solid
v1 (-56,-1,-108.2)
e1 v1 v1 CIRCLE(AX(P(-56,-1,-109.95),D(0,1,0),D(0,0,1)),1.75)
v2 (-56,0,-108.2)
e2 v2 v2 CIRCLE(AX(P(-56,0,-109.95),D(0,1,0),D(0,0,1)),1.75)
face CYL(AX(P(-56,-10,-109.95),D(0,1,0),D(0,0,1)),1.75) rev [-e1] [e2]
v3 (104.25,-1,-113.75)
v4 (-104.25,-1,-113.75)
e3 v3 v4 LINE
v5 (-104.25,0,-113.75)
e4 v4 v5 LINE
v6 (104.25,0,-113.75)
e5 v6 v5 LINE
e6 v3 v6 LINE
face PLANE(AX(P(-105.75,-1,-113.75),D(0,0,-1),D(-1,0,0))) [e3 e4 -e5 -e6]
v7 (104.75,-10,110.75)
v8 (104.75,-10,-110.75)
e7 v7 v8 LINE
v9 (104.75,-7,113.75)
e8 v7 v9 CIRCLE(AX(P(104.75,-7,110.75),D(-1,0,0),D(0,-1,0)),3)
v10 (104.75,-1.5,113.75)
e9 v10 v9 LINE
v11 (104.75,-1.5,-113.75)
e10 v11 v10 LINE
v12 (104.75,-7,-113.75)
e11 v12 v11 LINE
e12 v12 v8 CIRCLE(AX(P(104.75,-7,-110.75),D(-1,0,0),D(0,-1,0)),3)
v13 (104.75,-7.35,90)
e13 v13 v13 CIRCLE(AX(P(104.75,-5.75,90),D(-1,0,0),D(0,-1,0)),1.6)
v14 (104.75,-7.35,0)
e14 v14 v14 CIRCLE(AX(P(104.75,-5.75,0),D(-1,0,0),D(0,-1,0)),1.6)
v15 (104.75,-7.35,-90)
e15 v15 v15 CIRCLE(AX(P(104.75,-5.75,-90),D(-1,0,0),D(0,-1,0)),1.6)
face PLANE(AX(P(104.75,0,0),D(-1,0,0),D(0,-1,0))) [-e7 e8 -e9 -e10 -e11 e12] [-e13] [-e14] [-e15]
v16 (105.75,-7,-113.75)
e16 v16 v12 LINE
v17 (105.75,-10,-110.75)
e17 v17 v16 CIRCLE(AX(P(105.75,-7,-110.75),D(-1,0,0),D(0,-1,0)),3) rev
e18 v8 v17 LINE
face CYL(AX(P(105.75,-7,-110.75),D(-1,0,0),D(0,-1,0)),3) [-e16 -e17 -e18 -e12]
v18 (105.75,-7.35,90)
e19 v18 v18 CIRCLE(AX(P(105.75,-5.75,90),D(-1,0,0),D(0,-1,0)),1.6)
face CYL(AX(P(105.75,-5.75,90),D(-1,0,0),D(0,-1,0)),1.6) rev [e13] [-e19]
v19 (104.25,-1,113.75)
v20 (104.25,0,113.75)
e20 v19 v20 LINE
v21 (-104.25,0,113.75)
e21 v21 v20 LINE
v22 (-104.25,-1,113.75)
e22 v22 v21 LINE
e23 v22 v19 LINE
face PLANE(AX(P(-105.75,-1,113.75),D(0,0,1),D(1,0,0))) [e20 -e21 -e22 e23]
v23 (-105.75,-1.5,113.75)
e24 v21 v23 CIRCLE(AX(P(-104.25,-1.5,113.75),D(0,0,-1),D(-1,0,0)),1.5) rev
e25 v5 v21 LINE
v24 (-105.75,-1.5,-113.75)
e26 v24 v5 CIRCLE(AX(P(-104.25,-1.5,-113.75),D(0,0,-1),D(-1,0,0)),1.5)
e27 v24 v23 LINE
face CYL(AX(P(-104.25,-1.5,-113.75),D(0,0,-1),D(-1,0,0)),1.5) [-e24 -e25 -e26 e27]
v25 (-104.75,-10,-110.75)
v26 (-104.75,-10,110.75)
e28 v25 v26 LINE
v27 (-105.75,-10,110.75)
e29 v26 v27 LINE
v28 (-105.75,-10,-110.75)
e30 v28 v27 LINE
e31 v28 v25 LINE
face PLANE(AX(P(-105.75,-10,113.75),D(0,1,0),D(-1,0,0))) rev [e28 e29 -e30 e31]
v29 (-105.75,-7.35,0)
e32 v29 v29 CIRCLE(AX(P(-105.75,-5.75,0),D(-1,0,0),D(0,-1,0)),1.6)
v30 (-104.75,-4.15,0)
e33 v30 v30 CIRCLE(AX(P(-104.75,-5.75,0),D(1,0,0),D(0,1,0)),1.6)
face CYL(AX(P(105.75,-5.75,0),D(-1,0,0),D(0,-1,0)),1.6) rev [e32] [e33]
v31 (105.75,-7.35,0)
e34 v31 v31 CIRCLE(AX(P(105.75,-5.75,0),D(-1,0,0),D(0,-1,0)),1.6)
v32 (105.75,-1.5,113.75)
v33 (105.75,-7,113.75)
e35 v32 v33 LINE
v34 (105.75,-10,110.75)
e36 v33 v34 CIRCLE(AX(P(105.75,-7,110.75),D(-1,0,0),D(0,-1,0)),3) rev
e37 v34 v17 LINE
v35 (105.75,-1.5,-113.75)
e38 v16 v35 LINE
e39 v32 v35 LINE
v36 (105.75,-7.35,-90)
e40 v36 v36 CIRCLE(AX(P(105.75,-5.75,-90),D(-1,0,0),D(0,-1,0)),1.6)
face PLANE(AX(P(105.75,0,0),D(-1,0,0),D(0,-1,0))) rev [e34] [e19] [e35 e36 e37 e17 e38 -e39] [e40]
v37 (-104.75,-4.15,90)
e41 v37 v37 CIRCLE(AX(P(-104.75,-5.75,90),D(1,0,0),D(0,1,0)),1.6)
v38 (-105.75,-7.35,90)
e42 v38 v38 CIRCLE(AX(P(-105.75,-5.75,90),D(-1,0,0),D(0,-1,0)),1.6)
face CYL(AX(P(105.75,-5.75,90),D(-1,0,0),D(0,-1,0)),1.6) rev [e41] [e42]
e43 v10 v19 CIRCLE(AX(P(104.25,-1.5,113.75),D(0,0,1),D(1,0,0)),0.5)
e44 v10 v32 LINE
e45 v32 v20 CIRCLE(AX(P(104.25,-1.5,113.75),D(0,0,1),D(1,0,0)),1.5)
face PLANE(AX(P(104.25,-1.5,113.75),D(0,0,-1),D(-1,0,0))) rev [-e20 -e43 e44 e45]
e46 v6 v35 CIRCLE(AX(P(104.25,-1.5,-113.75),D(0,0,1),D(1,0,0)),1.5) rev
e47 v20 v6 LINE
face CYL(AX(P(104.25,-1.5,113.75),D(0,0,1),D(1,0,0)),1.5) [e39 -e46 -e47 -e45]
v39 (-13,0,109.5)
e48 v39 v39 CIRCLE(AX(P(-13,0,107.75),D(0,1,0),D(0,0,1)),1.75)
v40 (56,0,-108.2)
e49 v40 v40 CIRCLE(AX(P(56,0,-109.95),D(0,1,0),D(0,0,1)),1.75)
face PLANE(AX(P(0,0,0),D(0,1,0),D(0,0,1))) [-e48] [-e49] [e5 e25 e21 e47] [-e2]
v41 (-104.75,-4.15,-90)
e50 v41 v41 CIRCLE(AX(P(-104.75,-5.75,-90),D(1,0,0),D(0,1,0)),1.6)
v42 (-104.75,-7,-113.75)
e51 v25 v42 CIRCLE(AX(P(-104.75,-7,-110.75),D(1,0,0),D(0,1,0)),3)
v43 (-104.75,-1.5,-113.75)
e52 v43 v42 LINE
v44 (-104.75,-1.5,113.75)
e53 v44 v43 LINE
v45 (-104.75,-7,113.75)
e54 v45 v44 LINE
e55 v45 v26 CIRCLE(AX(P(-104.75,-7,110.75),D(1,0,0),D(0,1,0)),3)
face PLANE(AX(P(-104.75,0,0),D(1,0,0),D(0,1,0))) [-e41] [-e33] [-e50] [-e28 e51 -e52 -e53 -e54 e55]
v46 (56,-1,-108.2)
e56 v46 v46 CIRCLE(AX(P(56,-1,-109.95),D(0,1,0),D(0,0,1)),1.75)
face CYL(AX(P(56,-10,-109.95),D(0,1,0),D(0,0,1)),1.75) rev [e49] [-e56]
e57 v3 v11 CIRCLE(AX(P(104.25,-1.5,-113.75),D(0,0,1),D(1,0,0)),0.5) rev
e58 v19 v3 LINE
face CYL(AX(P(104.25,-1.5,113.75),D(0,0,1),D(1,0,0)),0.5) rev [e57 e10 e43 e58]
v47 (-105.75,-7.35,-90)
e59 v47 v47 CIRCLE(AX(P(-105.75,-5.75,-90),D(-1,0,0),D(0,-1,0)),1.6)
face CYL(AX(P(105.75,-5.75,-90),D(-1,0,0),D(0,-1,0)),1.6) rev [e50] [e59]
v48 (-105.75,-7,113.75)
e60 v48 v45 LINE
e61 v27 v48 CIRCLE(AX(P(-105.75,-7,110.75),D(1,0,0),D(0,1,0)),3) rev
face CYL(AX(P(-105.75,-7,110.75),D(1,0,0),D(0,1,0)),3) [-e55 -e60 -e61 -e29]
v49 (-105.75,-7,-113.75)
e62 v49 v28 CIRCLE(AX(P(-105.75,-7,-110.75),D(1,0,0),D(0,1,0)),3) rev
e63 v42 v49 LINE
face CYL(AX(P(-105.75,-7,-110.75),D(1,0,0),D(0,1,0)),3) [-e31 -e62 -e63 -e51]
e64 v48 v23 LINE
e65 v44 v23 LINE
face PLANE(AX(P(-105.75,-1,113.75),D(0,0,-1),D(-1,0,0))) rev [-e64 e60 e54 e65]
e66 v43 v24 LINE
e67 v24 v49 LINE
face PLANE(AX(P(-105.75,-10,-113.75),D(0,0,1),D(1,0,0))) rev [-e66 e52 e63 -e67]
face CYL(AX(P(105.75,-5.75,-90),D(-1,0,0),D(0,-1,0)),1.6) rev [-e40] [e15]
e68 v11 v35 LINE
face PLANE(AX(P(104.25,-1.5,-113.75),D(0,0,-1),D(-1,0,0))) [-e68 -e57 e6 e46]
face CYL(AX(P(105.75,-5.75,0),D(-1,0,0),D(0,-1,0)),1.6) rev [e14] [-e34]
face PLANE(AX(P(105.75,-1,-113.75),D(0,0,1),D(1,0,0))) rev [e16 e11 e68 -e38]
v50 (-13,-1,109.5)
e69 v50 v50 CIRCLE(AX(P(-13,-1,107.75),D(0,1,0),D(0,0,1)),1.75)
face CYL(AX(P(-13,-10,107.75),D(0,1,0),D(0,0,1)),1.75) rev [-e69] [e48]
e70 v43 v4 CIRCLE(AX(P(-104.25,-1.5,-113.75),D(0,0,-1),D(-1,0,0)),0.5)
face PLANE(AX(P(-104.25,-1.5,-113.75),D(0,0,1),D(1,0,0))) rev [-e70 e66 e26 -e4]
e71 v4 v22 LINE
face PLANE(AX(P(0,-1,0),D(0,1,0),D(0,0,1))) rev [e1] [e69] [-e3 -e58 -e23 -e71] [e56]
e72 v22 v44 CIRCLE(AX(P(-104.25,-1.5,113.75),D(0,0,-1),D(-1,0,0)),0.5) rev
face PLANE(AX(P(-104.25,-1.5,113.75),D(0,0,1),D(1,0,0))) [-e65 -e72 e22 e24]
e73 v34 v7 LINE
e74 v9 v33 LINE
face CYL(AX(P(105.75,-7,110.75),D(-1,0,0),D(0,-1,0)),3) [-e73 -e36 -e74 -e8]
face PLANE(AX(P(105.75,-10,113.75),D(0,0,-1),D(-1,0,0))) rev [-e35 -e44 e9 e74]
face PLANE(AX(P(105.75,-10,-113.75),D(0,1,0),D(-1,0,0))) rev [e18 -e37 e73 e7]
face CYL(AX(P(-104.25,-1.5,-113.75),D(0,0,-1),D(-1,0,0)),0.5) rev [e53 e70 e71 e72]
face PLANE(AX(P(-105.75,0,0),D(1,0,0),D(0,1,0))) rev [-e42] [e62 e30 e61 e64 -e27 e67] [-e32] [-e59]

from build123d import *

# Parameters (mm, degrees)
SKETCH1_W                    = 211.5
SKETCH1_H                    = 227.5
BASE_FLANGE1_DEPTH           = 1
EDGE_FLANGE1_STRIP_W         = 5
EDGE_FLANGE1_STRIP_H         = 1
EDGE_FLANGE1_STRIP_CUT_DEPTH = 227.5
EDGE_FLANGE1_DEPTH           = 227.5
EDGE_FLANGE2_STRIP_W         = 5
EDGE_FLANGE2_STRIP_H         = 1
EDGE_FLANGE2_STRIP_CUT_DEPTH = 227.5
EDGE_FLANGE2_DEPTH           = 227.5
SKETCH13_R                   = 1.6
CUT_EXTRUDE1_DEPTH           = 241.356636064
FILLET1_R                    = 3
SKETCH14_R                   = 1.75
CUT_EXTRUDE2_DEPTH           = 156.634588058
SKETCH15_R                   = 1.75
CUT_EXTRUDE3_DEPTH           = 156.634588058


# Sheet-metal steps are written as plain solids
with BuildPart() as part:
    # Sketch1 → Base-Flange1 (new body)
    with BuildSketch(Plane(origin=(0, 0, 0), x_dir=(1, 0, 0), z_dir=(0, 1, 0))):
        Rectangle(SKETCH1_W, SKETCH1_H)
    extrude(amount=-BASE_FLANGE1_DEPTH)

    # Edge-Flange1 strip (across the edge) → Edge-Flange1 strip cut (cut)
    with BuildSketch(Plane(origin=(105.75, -1, -113.75), x_dir=(-1, 0, 0), z_dir=(0, 0, 1))):
        with Locations((-1, -0.5)):
            Rectangle(EDGE_FLANGE1_STRIP_W, EDGE_FLANGE1_STRIP_H)
    extrude(amount=EDGE_FLANGE1_STRIP_CUT_DEPTH, mode=Mode.SUBTRACT)

    # Edge-Flange1 section (across the edge) → Edge-Flange1 (add)
    with BuildSketch(Plane(origin=(105.75, -1, -113.75), x_dir=(-1, 0, 0), z_dir=(0, 0, 1))):
        with BuildLine():
            Line((0, 0.5), (0, 9))
            Line((0, 9), (1, 9))
            Line((1, 9), (1, 0.5))
            ThreePointArc((1, 0.5), (1.146446609, 0.146446609), (1.5, 0))
            Line((1.5, 0), (1.5, -1))
            ThreePointArc((1.5, -1), (0.439339828, -0.560660172), (0, 0.5))
        make_face()
    extrude(amount=EDGE_FLANGE1_DEPTH)

    # Edge-Flange2 strip (across the edge) → Edge-Flange2 strip cut (cut)
    with BuildSketch(Plane(origin=(-105.75, -1, 113.75), x_dir=(1, 0, 0), z_dir=(0, 0, -1))):
        with Locations((-1, -0.5)):
            Rectangle(EDGE_FLANGE2_STRIP_W, EDGE_FLANGE2_STRIP_H)
    extrude(amount=EDGE_FLANGE2_STRIP_CUT_DEPTH, mode=Mode.SUBTRACT)

    # Edge-Flange2 section (across the edge) → Edge-Flange2 (add)
    with BuildSketch(Plane(origin=(-105.75, -1, 113.75), x_dir=(1, 0, 0), z_dir=(0, 0, -1))):
        with BuildLine():
            Line((0, 0.5), (0, 9))
            Line((0, 9), (1, 9))
            Line((1, 9), (1, 0.5))
            ThreePointArc((1, 0.5), (1.146446609, 0.146446609), (1.5, 0))
            Line((1.5, 0), (1.5, -1))
            ThreePointArc((1.5, -1), (0.439339828, -0.560660172), (0, 0.5))
        make_face()
    extrude(amount=EDGE_FLANGE2_DEPTH)

    # Sketch13 → Cut-Extrude1 (cut, through all)
    with BuildSketch(Plane.ZY.offset(105.75)):
        with Locations(Location((0, -5.75, 0), (0, 0, 270))):
            Circle(SKETCH13_R)
        with Locations(Location((90, -5.75, 0), (0, 0, 270))):
            Circle(SKETCH13_R)
        with Locations(Location((-90, -5.75, 0), (0, 0, 270))):
            Circle(SKETCH13_R)
    extrude(amount=-CUT_EXTRUDE1_DEPTH, mode=Mode.SUBTRACT)

    # Fillet1
    fillet1_edges = [part.edges().sort_by_distance(p)[0] for p in [
        (105.25, -10, -113.75),
        (105.25, -10, 113.75),
        (-105.25, -10, 113.75),
        (-105.25, -10, -113.75),
    ]]
    fillet(fillet1_edges, radius=FILLET1_R)

    # Sketch14 → Cut-Extrude2 (cut, through all)
    with BuildSketch(Plane(origin=(0, 0, 0), x_dir=(1, 0, 0), z_dir=(0, 1, 0))):
        with Locations(Location((-56, 109.95, 0), (0, 0, 270))):
            Circle(SKETCH14_R)
        with Locations(Location((56, 109.95, 0), (0, 0, 270))):
            Circle(SKETCH14_R)
    extrude(amount=-CUT_EXTRUDE2_DEPTH, mode=Mode.SUBTRACT)

    # Sketch15 → Cut-Extrude3 (cut, through all)
    with BuildSketch(Plane(origin=(0, 0, 0), x_dir=(1, 0, 0), z_dir=(0, 1, 0))):
        with Locations(Location((-13, -107.75, 0), (0, 0, 270))):
            Circle(SKETCH15_R)
    extrude(amount=-CUT_EXTRUDE3_DEPTH, mode=Mode.SUBTRACT)


solid = part.part
